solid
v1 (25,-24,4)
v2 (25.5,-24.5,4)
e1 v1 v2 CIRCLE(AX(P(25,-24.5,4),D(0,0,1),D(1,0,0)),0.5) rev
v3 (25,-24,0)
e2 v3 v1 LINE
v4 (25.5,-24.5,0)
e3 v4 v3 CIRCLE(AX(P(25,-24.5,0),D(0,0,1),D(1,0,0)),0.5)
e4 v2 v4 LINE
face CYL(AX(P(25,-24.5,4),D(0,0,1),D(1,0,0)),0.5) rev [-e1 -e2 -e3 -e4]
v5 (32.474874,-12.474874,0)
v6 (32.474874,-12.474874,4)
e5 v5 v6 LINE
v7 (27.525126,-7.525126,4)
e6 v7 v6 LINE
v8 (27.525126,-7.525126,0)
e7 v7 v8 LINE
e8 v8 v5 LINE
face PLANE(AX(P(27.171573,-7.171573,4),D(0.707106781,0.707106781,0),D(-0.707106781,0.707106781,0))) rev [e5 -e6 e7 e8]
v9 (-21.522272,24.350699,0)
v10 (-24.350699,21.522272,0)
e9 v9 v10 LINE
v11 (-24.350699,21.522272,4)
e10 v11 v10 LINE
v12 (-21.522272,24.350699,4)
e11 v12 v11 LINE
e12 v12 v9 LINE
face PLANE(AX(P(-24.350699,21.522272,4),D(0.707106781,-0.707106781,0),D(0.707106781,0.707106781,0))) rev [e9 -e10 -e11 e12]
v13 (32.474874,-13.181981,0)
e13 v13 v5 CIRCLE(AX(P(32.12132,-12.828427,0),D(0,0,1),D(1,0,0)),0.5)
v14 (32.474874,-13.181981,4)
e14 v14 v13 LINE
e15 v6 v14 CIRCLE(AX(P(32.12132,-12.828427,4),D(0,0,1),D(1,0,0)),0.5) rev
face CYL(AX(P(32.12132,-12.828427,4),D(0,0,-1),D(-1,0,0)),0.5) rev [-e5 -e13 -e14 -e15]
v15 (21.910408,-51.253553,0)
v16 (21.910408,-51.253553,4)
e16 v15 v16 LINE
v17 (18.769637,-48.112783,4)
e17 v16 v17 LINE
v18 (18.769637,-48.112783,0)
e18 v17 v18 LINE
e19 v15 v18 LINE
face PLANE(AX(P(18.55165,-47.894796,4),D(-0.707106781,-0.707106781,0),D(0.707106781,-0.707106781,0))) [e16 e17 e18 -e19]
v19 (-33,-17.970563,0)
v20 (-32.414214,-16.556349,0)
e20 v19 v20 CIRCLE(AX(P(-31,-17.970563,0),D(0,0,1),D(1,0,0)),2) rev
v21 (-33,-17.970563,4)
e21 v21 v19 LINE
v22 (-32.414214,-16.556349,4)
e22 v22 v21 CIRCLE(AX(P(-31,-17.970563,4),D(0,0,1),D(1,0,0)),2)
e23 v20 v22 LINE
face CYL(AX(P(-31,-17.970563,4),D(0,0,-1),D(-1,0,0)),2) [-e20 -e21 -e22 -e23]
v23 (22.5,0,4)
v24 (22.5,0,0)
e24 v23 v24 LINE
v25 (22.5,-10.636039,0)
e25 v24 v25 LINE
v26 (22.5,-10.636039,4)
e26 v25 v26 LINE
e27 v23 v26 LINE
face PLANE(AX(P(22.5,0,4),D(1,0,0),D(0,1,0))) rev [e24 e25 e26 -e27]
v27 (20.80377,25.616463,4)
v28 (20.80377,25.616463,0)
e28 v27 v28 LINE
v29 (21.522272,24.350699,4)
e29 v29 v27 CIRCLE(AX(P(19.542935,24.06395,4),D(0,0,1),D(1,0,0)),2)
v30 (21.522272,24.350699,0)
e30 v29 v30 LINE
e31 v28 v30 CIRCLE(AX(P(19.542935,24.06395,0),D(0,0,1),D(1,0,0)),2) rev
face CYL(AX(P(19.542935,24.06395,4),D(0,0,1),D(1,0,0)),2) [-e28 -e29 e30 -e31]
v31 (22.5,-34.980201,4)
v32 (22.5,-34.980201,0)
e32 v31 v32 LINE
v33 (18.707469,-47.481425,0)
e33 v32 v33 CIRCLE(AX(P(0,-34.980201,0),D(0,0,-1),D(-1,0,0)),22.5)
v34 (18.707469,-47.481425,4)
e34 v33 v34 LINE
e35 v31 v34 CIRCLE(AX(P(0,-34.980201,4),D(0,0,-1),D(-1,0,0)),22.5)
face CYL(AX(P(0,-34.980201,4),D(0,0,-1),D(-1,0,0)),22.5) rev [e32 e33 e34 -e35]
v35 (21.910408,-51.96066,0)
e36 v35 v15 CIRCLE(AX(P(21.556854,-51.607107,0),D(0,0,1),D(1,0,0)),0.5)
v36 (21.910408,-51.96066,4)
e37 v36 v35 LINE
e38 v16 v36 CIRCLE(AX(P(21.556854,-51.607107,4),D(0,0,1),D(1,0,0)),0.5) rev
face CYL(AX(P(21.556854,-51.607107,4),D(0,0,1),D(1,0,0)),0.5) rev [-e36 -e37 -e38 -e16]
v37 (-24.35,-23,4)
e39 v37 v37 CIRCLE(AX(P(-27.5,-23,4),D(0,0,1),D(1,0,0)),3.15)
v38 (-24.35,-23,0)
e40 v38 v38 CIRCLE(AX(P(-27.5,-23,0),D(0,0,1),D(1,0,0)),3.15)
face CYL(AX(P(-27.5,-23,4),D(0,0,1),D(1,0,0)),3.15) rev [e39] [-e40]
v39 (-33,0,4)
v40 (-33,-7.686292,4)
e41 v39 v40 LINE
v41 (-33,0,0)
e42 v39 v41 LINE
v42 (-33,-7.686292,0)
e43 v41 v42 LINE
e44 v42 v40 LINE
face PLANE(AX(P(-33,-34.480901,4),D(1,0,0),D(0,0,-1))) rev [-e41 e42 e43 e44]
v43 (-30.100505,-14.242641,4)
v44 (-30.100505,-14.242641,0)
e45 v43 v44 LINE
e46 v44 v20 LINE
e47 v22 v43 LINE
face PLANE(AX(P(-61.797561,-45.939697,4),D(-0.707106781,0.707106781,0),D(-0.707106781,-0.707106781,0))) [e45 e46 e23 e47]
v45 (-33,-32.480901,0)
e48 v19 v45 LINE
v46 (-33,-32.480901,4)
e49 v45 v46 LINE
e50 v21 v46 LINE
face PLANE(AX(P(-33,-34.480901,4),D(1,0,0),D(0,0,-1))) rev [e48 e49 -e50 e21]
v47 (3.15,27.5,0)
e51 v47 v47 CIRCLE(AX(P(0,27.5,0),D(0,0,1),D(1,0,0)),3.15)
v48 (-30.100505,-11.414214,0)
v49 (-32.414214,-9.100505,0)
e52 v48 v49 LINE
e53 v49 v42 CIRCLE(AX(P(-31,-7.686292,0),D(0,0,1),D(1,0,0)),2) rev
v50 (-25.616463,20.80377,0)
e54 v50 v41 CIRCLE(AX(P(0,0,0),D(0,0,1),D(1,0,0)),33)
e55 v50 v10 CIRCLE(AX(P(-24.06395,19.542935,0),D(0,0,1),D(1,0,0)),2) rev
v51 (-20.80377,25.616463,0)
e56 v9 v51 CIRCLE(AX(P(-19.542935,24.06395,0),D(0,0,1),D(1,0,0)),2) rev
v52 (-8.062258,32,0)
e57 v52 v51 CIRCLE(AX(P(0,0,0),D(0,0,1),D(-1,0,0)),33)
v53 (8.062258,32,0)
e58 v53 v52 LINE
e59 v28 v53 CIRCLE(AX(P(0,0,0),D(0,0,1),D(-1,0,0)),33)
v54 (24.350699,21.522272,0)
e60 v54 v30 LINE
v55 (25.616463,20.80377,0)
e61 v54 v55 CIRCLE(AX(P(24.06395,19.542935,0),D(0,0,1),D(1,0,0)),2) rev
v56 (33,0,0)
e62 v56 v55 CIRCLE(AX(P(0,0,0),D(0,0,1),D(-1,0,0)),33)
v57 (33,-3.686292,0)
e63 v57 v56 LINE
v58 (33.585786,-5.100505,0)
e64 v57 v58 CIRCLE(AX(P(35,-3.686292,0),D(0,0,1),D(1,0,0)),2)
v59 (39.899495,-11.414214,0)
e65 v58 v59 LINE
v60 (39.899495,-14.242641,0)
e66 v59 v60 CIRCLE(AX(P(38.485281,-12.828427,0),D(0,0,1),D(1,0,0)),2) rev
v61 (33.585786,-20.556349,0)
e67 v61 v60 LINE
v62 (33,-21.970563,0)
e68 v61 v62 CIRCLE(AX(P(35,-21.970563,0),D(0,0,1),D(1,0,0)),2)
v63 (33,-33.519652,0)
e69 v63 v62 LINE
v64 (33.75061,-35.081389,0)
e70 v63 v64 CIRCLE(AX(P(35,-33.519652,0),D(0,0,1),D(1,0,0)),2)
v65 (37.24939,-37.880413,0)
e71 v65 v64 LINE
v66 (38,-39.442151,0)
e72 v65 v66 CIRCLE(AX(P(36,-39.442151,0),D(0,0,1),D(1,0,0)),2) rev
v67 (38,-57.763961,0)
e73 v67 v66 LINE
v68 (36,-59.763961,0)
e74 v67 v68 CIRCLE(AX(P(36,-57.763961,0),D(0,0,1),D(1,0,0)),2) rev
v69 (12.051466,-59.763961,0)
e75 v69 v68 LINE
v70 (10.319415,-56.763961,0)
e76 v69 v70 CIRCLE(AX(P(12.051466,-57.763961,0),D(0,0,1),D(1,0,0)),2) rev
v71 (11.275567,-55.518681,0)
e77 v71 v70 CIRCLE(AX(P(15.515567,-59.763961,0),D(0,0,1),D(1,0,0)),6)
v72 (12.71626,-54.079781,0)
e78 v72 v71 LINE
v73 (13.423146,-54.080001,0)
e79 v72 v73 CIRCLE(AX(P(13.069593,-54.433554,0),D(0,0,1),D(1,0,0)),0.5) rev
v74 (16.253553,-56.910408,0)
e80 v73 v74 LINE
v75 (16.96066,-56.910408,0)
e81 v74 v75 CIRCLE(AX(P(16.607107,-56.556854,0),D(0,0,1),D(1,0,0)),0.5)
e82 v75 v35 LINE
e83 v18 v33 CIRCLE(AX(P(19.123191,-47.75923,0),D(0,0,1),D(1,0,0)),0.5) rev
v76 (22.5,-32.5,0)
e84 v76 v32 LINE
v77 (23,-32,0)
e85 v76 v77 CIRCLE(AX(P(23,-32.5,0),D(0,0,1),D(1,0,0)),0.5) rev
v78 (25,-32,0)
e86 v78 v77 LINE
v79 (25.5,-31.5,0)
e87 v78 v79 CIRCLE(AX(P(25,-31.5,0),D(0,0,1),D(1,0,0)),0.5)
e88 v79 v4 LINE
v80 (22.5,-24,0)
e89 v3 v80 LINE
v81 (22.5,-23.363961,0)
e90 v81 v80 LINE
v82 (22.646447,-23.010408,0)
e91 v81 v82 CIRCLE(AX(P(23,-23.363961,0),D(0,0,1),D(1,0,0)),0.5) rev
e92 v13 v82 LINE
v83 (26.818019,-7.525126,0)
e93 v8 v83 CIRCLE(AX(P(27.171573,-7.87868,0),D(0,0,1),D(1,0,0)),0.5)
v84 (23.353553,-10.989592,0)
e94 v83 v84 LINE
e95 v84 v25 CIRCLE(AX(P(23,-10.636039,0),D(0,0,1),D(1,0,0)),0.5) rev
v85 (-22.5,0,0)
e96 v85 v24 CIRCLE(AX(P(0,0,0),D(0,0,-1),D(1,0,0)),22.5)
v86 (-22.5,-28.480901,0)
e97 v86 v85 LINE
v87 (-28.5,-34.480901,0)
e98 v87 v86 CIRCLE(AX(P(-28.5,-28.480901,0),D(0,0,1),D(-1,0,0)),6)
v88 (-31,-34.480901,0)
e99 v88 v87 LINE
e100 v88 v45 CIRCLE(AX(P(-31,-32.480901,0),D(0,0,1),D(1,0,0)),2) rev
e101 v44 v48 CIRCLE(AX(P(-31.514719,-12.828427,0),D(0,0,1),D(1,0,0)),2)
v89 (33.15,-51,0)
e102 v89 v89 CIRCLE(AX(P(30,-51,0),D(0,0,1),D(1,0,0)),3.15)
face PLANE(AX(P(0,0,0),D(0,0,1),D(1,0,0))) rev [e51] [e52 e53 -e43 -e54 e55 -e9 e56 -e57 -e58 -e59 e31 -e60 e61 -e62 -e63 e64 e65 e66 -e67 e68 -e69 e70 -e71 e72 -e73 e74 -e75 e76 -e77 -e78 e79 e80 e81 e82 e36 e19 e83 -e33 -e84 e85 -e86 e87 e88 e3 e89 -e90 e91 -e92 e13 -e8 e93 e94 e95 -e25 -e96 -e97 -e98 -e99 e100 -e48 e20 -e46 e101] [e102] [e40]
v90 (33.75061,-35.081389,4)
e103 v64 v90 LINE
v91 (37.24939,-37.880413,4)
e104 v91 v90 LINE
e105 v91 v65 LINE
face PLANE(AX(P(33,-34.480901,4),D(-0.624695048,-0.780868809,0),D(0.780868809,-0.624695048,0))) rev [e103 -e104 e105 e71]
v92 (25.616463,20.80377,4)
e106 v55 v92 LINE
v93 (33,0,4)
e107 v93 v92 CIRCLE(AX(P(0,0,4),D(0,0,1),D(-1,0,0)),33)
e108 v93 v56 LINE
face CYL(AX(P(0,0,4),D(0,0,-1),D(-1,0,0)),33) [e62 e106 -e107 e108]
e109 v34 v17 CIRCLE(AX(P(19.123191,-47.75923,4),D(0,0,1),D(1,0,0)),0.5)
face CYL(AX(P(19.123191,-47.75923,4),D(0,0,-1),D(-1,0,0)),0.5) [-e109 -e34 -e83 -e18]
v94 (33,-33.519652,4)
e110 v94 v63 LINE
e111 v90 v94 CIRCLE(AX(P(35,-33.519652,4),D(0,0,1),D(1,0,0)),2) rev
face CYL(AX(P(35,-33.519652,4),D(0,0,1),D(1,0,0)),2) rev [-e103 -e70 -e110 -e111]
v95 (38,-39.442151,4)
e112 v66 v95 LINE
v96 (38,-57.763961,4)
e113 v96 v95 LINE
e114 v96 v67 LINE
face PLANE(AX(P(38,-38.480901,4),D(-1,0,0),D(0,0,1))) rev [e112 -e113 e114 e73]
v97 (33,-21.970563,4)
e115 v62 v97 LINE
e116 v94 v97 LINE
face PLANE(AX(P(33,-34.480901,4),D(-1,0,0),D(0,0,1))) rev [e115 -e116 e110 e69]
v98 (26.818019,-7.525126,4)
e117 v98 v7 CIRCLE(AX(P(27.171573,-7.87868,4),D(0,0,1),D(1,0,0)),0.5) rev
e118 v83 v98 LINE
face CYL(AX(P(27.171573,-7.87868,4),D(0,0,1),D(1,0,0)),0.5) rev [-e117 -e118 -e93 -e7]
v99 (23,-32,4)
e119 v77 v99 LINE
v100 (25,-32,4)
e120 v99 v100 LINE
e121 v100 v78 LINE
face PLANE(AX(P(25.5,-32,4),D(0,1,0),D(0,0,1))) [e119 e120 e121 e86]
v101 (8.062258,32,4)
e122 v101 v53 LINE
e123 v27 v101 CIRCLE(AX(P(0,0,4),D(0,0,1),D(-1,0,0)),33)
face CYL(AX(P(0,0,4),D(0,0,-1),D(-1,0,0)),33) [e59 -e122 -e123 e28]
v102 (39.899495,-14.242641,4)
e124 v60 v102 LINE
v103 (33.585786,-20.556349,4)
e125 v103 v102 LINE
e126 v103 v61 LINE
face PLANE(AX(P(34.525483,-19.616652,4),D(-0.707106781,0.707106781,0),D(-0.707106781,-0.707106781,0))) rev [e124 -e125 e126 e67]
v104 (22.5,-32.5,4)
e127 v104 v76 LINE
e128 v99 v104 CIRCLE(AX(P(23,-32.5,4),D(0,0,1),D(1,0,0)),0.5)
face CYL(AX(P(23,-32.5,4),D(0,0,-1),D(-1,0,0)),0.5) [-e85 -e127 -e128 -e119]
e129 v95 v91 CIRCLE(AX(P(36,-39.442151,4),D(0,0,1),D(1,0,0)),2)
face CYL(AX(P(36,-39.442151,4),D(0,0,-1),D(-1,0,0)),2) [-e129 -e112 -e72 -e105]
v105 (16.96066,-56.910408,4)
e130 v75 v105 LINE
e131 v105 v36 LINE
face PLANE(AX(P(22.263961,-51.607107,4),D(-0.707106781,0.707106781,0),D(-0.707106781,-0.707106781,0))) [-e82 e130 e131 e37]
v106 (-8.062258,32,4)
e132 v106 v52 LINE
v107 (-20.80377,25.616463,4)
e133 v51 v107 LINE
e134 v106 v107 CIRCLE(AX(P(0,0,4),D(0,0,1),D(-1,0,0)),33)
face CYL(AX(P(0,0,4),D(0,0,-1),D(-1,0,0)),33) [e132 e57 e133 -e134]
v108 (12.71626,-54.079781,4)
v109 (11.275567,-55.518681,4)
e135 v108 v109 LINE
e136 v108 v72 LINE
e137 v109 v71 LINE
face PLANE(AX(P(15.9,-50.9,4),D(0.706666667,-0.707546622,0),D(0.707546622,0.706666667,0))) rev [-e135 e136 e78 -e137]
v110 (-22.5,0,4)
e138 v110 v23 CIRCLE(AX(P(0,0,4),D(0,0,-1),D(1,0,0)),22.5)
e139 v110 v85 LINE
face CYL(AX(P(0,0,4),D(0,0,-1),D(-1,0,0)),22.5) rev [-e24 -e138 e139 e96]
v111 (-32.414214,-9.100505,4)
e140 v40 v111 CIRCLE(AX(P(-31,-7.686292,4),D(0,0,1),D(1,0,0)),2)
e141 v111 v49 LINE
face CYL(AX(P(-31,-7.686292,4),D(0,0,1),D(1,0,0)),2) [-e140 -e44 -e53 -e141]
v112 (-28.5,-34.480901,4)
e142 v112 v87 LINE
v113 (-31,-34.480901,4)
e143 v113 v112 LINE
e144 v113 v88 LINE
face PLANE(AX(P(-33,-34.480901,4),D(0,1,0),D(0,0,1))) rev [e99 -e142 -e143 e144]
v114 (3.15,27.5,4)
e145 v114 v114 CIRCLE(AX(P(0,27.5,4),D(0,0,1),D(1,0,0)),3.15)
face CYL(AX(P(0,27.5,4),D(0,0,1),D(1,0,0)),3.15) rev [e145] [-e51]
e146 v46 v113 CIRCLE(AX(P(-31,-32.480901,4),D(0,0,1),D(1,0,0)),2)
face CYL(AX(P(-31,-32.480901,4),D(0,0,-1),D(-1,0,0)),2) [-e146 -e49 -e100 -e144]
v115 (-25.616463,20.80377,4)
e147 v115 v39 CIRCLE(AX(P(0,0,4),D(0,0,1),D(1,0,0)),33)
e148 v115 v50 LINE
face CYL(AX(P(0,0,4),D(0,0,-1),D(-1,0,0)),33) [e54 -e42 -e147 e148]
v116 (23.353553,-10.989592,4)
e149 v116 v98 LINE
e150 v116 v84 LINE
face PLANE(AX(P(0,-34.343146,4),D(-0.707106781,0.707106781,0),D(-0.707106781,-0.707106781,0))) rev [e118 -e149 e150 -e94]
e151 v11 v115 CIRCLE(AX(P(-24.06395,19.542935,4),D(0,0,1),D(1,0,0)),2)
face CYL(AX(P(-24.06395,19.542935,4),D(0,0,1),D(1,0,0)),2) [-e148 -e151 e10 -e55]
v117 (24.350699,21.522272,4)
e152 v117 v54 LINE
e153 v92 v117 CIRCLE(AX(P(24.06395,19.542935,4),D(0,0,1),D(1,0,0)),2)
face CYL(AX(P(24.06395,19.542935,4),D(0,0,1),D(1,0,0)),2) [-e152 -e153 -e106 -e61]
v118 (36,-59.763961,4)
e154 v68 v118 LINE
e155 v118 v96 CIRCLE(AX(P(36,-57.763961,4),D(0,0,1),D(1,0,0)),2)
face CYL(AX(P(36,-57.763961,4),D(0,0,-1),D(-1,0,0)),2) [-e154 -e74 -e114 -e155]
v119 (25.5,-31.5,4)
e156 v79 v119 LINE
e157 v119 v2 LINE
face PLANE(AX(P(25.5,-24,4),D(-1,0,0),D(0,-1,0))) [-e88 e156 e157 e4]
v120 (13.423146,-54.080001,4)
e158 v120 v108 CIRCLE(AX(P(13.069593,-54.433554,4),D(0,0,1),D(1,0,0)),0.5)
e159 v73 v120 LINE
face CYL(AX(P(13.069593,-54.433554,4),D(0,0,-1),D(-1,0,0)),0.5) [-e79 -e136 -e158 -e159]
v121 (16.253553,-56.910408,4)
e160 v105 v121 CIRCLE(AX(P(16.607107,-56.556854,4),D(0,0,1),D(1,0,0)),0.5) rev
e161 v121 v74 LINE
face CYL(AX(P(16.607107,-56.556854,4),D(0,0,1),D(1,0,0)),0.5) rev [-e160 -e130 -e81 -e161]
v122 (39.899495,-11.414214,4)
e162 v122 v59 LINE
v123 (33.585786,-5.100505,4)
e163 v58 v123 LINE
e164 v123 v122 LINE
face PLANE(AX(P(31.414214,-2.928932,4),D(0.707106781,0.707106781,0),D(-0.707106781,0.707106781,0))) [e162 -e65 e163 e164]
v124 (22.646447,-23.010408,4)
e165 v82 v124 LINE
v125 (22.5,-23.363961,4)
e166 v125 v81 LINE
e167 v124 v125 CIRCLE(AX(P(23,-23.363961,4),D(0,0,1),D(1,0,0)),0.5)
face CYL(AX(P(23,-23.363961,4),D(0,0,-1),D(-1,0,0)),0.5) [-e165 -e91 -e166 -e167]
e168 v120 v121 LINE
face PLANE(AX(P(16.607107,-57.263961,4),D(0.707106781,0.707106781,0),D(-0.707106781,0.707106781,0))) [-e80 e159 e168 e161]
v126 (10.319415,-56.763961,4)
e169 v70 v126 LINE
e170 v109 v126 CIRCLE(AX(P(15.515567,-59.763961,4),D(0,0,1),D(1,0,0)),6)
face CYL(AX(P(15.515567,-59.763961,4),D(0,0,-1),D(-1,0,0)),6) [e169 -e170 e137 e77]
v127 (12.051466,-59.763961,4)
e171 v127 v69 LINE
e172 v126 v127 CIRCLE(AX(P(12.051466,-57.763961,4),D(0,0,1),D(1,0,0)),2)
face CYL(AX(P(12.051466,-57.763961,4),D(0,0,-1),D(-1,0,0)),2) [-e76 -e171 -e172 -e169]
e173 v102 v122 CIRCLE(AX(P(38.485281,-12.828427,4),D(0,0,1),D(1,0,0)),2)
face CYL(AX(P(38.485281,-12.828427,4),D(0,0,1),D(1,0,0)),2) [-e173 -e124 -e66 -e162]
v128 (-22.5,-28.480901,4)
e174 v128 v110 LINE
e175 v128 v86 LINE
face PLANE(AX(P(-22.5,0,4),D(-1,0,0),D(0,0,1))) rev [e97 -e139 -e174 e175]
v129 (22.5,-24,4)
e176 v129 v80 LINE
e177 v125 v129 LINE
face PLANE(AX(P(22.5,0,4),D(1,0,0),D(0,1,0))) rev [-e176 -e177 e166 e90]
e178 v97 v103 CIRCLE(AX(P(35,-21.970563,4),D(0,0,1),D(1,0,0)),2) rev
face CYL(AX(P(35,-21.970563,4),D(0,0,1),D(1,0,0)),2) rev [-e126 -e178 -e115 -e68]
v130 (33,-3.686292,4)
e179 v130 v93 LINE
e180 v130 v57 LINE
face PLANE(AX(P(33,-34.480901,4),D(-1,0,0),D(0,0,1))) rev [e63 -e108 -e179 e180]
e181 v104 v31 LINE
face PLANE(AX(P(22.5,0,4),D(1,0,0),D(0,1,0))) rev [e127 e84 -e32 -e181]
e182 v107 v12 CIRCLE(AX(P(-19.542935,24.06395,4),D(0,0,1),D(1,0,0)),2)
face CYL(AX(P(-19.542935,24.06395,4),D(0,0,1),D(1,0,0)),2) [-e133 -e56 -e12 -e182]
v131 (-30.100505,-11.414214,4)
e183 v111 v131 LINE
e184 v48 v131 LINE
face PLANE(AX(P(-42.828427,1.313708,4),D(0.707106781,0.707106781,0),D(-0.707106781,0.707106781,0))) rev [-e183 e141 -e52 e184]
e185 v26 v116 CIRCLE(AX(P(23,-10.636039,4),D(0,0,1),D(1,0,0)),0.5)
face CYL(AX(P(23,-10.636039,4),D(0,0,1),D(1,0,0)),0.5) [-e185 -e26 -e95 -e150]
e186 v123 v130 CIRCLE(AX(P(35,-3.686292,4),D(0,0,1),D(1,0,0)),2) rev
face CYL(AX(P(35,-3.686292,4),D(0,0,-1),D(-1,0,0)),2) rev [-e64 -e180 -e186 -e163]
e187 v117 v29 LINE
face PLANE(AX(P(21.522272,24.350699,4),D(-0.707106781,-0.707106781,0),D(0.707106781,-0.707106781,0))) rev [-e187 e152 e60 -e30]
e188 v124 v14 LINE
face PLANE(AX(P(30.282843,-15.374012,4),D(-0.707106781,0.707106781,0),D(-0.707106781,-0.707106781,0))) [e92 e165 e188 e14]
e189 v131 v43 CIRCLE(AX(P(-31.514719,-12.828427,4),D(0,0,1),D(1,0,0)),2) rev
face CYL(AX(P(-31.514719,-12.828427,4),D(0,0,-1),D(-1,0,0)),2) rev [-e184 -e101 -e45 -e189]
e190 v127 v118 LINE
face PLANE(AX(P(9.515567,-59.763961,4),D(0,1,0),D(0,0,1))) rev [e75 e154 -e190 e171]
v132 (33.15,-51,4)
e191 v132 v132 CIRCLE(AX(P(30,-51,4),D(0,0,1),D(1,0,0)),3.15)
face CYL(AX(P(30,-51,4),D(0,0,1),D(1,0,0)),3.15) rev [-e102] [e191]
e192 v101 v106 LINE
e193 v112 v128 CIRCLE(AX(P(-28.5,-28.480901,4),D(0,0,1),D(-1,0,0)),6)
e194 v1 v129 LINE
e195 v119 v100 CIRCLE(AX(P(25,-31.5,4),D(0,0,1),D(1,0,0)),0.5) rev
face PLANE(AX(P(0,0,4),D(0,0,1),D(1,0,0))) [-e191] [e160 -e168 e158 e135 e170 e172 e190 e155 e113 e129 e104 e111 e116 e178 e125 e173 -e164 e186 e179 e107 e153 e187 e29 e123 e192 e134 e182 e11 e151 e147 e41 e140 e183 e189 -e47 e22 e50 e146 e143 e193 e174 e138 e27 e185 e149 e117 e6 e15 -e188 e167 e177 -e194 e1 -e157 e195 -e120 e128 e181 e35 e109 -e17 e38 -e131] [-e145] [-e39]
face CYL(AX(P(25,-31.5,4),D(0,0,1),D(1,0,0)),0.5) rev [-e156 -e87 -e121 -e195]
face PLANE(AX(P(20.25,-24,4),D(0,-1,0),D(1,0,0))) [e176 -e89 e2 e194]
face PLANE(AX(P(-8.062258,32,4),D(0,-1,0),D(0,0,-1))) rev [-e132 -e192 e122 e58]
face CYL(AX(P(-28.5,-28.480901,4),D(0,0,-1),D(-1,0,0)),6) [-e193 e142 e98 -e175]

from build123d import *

# Parameters (mm, degrees)
CORPS_DEPTH                     = 4
DIAM_TRE_DU_PER_AGE_6_2_6_3_1_D = 6.3
RENFORT_CAVITE_IR_DEPTH         = 4
CAVITE_IR_DEPTH                 = 73.7636828920554
CAVITE_SWITCH_DEPTH             = 73.7636828920554
CONG_1_R                        = 2
CONG_2_R                        = 0.5


with BuildPart() as part:
    # Esquisse1 → corps (new body)
    with BuildSketch(Plane.XY):
        with BuildLine():
            Line((-21.522272155725624, 24.35069928047194), (-21.522272155725624, 25.01583101267831))
            ThreePointArc((-21.522272155725624, 25.01583101267831), (-15.198873528041206, 29.291538769388826), (-8.062257748298553, 32))
            Line((-8.062257748298553, 32), (8.062257748298553, 32))
            ThreePointArc((8.062257748298553, 32), (15.198873528041206, 29.29153876938882), (21.522272155725624, 25.015831012678305))
            Line((21.522272155725624, 25.015831012678305), (21.522272155725624, 24.350699280471943))
            Line((21.522272155725624, 24.350699280471943), (24.35069928047182, 21.522272155725762))
            Line((24.35069928047182, 21.522272155725762), (25.015831012678188, 21.522272155725762))
            ThreePointArc((25.015831012678188, 21.522272155725762), (30.93963819615851, 11.477751883135042), (33, 0))
            Line((33, 0), (33, -34.48090133377067))
            Line((33, -34.48090133377067), (38, -38.48090133377066))
            Line((38, -38.48090133377066), (38, -59.76396103067893))
            Line((38, -59.76396103067893), (9.515567427896173, -59.76396103067893))
            ThreePointArc((9.515567427896173, -59.76396103067893), (9.973004843675767, -57.46613597206372), (11.275567427896174, -55.51868129902402))
            Line((11.275567427896174, -55.51868129902402), (15.9, -50.9))
            ThreePointArc((15.9, -50.9), (20.78460969082653, -43.597044976101124), (22.500000000000004, -34.98020100629408))
            Line((22.500000000000004, -34.98020100629408), (22.5, 0))
            ThreePointArc((22.5, 0), (1.38e-15, 22.5), (-22.5, 0))
            Line((-22.5, 0), (-22.5, -28.480901333770667))
            ThreePointArc((-22.5, -28.480901333770667), (-24.257359312880713, -32.723542020889944), (-28.499999999999993, -34.48090133377067))
            Line((-28.499999999999993, -34.48090133377067), (-33, -34.48090133377067))
            Line((-33, -34.48090133377067), (-33, 0))
            ThreePointArc((-33, 0), (-30.939638196158512, 11.477751883135037), (-25.015831012678195, 21.522272155725755))
            Line((-25.015831012678195, 21.522272155725755), (-24.35069928047182, 21.52227215572576))
            Line((-24.35069928047182, 21.52227215572576), (-21.522272155725624, 24.35069928047194))
        make_face()
    extrude(amount=CORPS_DEPTH)

    # Diamètre du perçage Ø6.2 (6.3)1 (through all)
    with Locations(Plane.XY.offset(4)):
        with Locations((0, 27.5), (30, -51), (-27.5, -23)):
            Hole(DIAM_TRE_DU_PER_AGE_6_2_6_3_1_D / 2)

    # Esquisse4 → renfort_cavite_IR (add, through all)
    with BuildSketch(Plane.XY):
        Polygon((31.414213562373053, -2.928932188134515), (41.313708498984774, -12.828427124746126), (34.525483399593966, -19.61665222413702), (27.454415587728445, -26.68772003600261), (24.62598846298224, -9.717157287525408), align=None)
    extrude(amount=RENFORT_CAVITE_IR_DEPTH)

    # Esquisse4<4> → cavite_IR (cut, through all)
    with BuildSketch(Plane.XY):
        Polygon((4.3e-16, -34.34314575050794), (24.62598846298224, -9.717157287525408), (27.17157287525379, -7.171572875253825), (32.828427124746206, -12.828427124746176), (30.282842712474658, -15.37401153701776), (1.73e-15, -45.65685424949275), align=None)
        Polygon((-75.93969696196702, -31.797561338236385), (-42.82842712474626, 1.313708498984752), (-28.686291501015212, -12.828427124746126), (-61.79756133823598, -45.93969696196728), align=None)
    extrude(amount=CAVITE_IR_DEPTH, mode=Mode.SUBTRACT)

    # Esquisse5 → cavite_switch (cut, through all)
    with BuildSketch(Plane.XY):
        Polygon((18.90520382004283, -48.24834957055045), (21.910407640085666, -51.25355339059327), (22.263961030678935, -51.607106781186545), (16.607106781186562, -57.26396103067893), (16.253553390593282, -56.910407640085644), (13.24834957055045, -53.905203820042814), (12.894796179957178, -53.551650429449545), (11.671501448504449, -52.32835569799682), (17.32835569799682, -46.671501448504436), (18.55165042944955, -47.89479617995717), align=None)
        Polygon((20.249999999999996, -31.999999999999993), (18.51999999999999, -32), (18.51999999999999, -23.999999999999993), (20.249999999999996, -23.999999999999996), (20.750000000000007, -23.99999999999999), (25.000000000000007, -23.99999999999999), (25.50000000000001, -24), (25.500000000000007, -32), (25.00000000000001, -32), (20.750000000000007, -32), align=None)
    extrude(amount=CAVITE_SWITCH_DEPTH, mode=Mode.SUBTRACT)

    # Congé1
    # the kernel refuses this fillet: 2 mm, written as the material it adds along each edge
    with BuildSketch(Plane(origin=(33, -4.514718625761442, 0), x_dir=(0.7071067811865507, -0.7071067811865442, 0), z_dir=(0, 0, 1))) as cong_1_piece_1:
        with BuildLine():
            CenterArc((CONG_1_R * 0.414213562373, CONG_1_R), CONG_1_R, 224.99999999999966, 45.000000000000455)
            Line((-CONG_1_R * 0.292893218813, CONG_1_R * 0.292893218813), (0, 0))
            Line((0, 0), (CONG_1_R * 0.414213562373, 1e-17))
        make_face()
    extrude(amount=4)
    with BuildSketch(Plane(origin=(33, -21.142135623731004, 4), x_dir=(0, -1, 0), z_dir=(0, 0, -1))) as cong_1_piece_2:
        with BuildLine():
            CenterArc((CONG_1_R * 0.414213562373, -CONG_1_R), CONG_1_R, 90, 44.999999999999574)
            Line((-CONG_1_R * 0.292893218813, -CONG_1_R * 0.292893218813), (0, 0))
            Line((0, 0), (CONG_1_R * 0.414213562373, 0))
        make_face()
    extrude(amount=4)
    with BuildSketch(Plane(origin=(33, -34.48090133377067, 0), x_dir=(0.7808688094430318, -0.6246950475544225, 0), z_dir=(0, 0, 1))) as cong_1_piece_3:
        with BuildLine():
            CenterArc((CONG_1_R * 0.480624847487, CONG_1_R), CONG_1_R, 218.65980825408994, 51.34019174590992)
            Line((-CONG_1_R * 0.300243961956, CONG_1_R * 0.375304952446), (0, 0))
            Line((0, 0), (CONG_1_R * 0.480624847487, 1e-17))
        make_face()
    extrude(amount=4)
    with BuildSketch(Plane(origin=(-28.686291501015212, -12.828427124746126, 0), x_dir=(-0.7071067811865511, 0.707106781186544, 0), z_dir=(0, 0, 1))) as cong_1_piece_4:
        with BuildLine():
            CenterArc((CONG_1_R, CONG_1_R), CONG_1_R, 179.9999999999999, 90.00000000000023)
            Line((-7.52e-15, CONG_1_R), (0, 0))
            Line((0, 0), (CONG_1_R, 2e-17))
        make_face()
    extrude(amount=4)
    # the kernel refuses this fillet: 2 mm, written as the material it takes off along each edge
    with BuildSketch(Plane(origin=(-25.0158310126782, 21.52227215572575, -2.3412126230346395), x_dir=(1, 0, 0), z_dir=(0, 0, 1))) as cong_1_2_piece_1:
        with BuildLine():
            CenterArc((0.9518811347481559, -1.979336954674956), CONG_1_R, 98.24317304928408, 42.67591267968572)
            ThreePointArc((-0.6006317606021696, -0.7185024255749006), (-0.30286474640058003, -0.35712048938501084), (0, 0))
            Line((0, 0), (0.6651317322063797, 0))
        make_face()
    extrude(amount=8.682425246069279, mode=Mode.SUBTRACT)
    with BuildSketch(Plane(origin=(-21.522272155725624, 25.015831012678312, -2.341212623034707), x_dir=(0.7672332048205719, 0.6413682323133525, 0), z_dir=(0, 0, 1))) as cong_1_2_piece_2:
        with BuildLine():
            CenterArc((0.9081067143892164, -1.9997986573934323), CONG_1_R, 89.18699331013795, 42.675912679686405)
            Line((-0.4265943633407193, -0.5103111505285536), (0, 0))
            ThreePointArc((0, 0), (0.46824252460693927, 0.00332215300834937), (0.936485049213883, -9e-17))
        make_face()
    extrude(amount=8.682425246069414, mode=Mode.SUBTRACT)
    with BuildSketch(Plane(origin=(25.015831012678184, 21.522272155725762, -2.341212623034682), x_dir=(0.6413682323133517, -0.7672332048205726, 0), z_dir=(0, 0, 1))) as cong_1_2_piece_3:
        with BuildLine():
            CenterArc((0.9081067143892213, -1.9997986573934339), CONG_1_R, 89.18699331013839, 42.67591267968582)
            Line((-0.42659436334071155, -0.5103111505285509), (0, 0))
            ThreePointArc((0, 0), (0.46824252460693927, 0.00332215300834983), (0.936485049213873, -2e-17))
        make_face()
    extrude(amount=8.682425246069364, mode=Mode.SUBTRACT)
    with BuildSketch(Plane(origin=(21.522272155725624, 25.015831012678305, -2.3412126230346706), x_dir=(5.34e-15, -1, 0), z_dir=(0, 0, 1))) as cong_1_2_piece_4:
        with BuildLine():
            CenterArc((0.9518811347481454, -1.9793369546749575), CONG_1_R, 98.24317304928427, 42.67591267968571)
            ThreePointArc((-0.6006317606021806, -0.7185024255749081), (-0.30286474640058547, -0.3571204893850199), (0, 0))
            Line((0, 0), (0.6651317322063619, 0))
        make_face()
    extrude(amount=8.682425246069341, mode=Mode.SUBTRACT)
    with BuildSketch(Plane(origin=(41.313708498984774, -12.828427124746126, -4.999999999999984), x_dir=(-0.7071067811865427, -0.7071067811865525, 0), z_dir=(0, 0, 1))) as cong_1_2_piece_5:
        with BuildLine():
            CenterArc((CONG_1_R, -CONG_1_R), CONG_1_R, 90.00000000000004, 89.99999999999976)
            Line((-1.126e-14, -CONG_1_R), (0, 0))
            Line((0, 0), (CONG_1_R, -5e-17))
        make_face()
    extrude(amount=13.999999999999968, mode=Mode.SUBTRACT)
    with BuildSketch(Plane(origin=(38, -38.48090133377066, -2.403124237432852), x_dir=(0, -1, 0), z_dir=(0, 0, 1))) as cong_1_2_piece_6:
        with BuildLine():
            CenterArc((CONG_1_R * 0.480624847487, -CONG_1_R), CONG_1_R, 90, 51.340191745909806)
            Line((-CONG_1_R * 0.300243961956, -CONG_1_R * 0.375304952446), (0, 0))
            Line((0, 0), (CONG_1_R * 0.480624847487, 0))
        make_face()
    extrude(amount=8.806248474865704, mode=Mode.SUBTRACT)
    with BuildSketch(Plane(origin=(38, -59.76396103067893, -5), x_dir=(-1, 0, 0), z_dir=(0, 0, 1)), Plane(origin=(-33, -34.48090133377067, -5), x_dir=(0, 1, 0), z_dir=(0, 0, 1))) as cong_1_2_piece_7:
        with BuildLine():
            CenterArc((CONG_1_R, -CONG_1_R), CONG_1_R, 90, 90)
            Line((0, -CONG_1_R), (0, 0))
            Line((0, 0), (CONG_1_R, 0))
        make_face()
    extrude(amount=14, mode=Mode.SUBTRACT)
    with BuildSketch(Plane(origin=(9.515567427896173, -59.76396103067893, -7.764571353075624), x_dir=(1, 0, 0), z_dir=(0, 0, 1))) as cong_1_2_piece_8:
        with BuildLine():
            CenterArc((2.5358983848622465, 2), CONG_1_R, 150, 120)
            ThreePointArc((0.8038475772933698, 3), (0.20444504226559168, 1.5529142706151262), (0, 0))
            Line((0, 0), (2.5358983848622465, 0))
        make_face()
    extrude(amount=19.529142706151248, mode=Mode.SUBTRACT)
    with BuildSketch(Plane(origin=(-33, -17.142135623730965, -2.0710678118654613), x_dir=(0.7071067811865432, 0.7071067811865518, 0), z_dir=(0, 0, 1))) as cong_1_2_piece_9:
        with BuildLine():
            CenterArc((CONG_1_R * 0.414213562373, -CONG_1_R), CONG_1_R, 90.00000000000003, 44.99999999999963)
            Line((-CONG_1_R * 0.292893218813, -CONG_1_R * 0.292893218813), (0, 0))
            Line((0, 0), (CONG_1_R * 0.414213562373, 1e-17))
        make_face()
    extrude(amount=8.142135623730923, mode=Mode.SUBTRACT)
    with BuildSketch(Plane(origin=(-33, -8.51471862576139, 6.071067811865498), x_dir=(0, 1, 0), z_dir=(0, 0, -1))) as cong_1_2_piece_10:
        with BuildLine():
            CenterArc((CONG_1_R * 0.414213562373, CONG_1_R), CONG_1_R, 224.99999999999957, 45.000000000000455)
            Line((-CONG_1_R * 0.292893218813, CONG_1_R * 0.292893218813), (0, 0))
            Line((0, 0), (CONG_1_R * 0.414213562373, 0))
        make_face()
    extrude(amount=8.142135623730995, mode=Mode.SUBTRACT)

    # Congé2
    cong_2_edges = [part.edges().sort_by_distance(p)[0] for p in [
        (22.500000000000007, -11.843145750507656, 2),
        (27.17157287525379, -7.171572875253825, 2),
        (22.500000000000004, -23.15685424949253, 2),
        (32.828427124746206, -12.828427124746176, 2),
        (13.069812964361518, -53.726667213853844, 2),
        (18.47678110683533, -47.81992685734296, 2),
        (22.263961030678935, -51.607106781186545, 2),
        (16.607106781186562, -57.26396103067893, 2),
        (25.50000000000001, -24, 2),
        (22.500000000000004, -31.999999999999986, 2),
        (25.500000000000007, -32, 2),
    ]]
    fillet(cong_2_edges, radius=CONG_2_R)


solid = part.part
